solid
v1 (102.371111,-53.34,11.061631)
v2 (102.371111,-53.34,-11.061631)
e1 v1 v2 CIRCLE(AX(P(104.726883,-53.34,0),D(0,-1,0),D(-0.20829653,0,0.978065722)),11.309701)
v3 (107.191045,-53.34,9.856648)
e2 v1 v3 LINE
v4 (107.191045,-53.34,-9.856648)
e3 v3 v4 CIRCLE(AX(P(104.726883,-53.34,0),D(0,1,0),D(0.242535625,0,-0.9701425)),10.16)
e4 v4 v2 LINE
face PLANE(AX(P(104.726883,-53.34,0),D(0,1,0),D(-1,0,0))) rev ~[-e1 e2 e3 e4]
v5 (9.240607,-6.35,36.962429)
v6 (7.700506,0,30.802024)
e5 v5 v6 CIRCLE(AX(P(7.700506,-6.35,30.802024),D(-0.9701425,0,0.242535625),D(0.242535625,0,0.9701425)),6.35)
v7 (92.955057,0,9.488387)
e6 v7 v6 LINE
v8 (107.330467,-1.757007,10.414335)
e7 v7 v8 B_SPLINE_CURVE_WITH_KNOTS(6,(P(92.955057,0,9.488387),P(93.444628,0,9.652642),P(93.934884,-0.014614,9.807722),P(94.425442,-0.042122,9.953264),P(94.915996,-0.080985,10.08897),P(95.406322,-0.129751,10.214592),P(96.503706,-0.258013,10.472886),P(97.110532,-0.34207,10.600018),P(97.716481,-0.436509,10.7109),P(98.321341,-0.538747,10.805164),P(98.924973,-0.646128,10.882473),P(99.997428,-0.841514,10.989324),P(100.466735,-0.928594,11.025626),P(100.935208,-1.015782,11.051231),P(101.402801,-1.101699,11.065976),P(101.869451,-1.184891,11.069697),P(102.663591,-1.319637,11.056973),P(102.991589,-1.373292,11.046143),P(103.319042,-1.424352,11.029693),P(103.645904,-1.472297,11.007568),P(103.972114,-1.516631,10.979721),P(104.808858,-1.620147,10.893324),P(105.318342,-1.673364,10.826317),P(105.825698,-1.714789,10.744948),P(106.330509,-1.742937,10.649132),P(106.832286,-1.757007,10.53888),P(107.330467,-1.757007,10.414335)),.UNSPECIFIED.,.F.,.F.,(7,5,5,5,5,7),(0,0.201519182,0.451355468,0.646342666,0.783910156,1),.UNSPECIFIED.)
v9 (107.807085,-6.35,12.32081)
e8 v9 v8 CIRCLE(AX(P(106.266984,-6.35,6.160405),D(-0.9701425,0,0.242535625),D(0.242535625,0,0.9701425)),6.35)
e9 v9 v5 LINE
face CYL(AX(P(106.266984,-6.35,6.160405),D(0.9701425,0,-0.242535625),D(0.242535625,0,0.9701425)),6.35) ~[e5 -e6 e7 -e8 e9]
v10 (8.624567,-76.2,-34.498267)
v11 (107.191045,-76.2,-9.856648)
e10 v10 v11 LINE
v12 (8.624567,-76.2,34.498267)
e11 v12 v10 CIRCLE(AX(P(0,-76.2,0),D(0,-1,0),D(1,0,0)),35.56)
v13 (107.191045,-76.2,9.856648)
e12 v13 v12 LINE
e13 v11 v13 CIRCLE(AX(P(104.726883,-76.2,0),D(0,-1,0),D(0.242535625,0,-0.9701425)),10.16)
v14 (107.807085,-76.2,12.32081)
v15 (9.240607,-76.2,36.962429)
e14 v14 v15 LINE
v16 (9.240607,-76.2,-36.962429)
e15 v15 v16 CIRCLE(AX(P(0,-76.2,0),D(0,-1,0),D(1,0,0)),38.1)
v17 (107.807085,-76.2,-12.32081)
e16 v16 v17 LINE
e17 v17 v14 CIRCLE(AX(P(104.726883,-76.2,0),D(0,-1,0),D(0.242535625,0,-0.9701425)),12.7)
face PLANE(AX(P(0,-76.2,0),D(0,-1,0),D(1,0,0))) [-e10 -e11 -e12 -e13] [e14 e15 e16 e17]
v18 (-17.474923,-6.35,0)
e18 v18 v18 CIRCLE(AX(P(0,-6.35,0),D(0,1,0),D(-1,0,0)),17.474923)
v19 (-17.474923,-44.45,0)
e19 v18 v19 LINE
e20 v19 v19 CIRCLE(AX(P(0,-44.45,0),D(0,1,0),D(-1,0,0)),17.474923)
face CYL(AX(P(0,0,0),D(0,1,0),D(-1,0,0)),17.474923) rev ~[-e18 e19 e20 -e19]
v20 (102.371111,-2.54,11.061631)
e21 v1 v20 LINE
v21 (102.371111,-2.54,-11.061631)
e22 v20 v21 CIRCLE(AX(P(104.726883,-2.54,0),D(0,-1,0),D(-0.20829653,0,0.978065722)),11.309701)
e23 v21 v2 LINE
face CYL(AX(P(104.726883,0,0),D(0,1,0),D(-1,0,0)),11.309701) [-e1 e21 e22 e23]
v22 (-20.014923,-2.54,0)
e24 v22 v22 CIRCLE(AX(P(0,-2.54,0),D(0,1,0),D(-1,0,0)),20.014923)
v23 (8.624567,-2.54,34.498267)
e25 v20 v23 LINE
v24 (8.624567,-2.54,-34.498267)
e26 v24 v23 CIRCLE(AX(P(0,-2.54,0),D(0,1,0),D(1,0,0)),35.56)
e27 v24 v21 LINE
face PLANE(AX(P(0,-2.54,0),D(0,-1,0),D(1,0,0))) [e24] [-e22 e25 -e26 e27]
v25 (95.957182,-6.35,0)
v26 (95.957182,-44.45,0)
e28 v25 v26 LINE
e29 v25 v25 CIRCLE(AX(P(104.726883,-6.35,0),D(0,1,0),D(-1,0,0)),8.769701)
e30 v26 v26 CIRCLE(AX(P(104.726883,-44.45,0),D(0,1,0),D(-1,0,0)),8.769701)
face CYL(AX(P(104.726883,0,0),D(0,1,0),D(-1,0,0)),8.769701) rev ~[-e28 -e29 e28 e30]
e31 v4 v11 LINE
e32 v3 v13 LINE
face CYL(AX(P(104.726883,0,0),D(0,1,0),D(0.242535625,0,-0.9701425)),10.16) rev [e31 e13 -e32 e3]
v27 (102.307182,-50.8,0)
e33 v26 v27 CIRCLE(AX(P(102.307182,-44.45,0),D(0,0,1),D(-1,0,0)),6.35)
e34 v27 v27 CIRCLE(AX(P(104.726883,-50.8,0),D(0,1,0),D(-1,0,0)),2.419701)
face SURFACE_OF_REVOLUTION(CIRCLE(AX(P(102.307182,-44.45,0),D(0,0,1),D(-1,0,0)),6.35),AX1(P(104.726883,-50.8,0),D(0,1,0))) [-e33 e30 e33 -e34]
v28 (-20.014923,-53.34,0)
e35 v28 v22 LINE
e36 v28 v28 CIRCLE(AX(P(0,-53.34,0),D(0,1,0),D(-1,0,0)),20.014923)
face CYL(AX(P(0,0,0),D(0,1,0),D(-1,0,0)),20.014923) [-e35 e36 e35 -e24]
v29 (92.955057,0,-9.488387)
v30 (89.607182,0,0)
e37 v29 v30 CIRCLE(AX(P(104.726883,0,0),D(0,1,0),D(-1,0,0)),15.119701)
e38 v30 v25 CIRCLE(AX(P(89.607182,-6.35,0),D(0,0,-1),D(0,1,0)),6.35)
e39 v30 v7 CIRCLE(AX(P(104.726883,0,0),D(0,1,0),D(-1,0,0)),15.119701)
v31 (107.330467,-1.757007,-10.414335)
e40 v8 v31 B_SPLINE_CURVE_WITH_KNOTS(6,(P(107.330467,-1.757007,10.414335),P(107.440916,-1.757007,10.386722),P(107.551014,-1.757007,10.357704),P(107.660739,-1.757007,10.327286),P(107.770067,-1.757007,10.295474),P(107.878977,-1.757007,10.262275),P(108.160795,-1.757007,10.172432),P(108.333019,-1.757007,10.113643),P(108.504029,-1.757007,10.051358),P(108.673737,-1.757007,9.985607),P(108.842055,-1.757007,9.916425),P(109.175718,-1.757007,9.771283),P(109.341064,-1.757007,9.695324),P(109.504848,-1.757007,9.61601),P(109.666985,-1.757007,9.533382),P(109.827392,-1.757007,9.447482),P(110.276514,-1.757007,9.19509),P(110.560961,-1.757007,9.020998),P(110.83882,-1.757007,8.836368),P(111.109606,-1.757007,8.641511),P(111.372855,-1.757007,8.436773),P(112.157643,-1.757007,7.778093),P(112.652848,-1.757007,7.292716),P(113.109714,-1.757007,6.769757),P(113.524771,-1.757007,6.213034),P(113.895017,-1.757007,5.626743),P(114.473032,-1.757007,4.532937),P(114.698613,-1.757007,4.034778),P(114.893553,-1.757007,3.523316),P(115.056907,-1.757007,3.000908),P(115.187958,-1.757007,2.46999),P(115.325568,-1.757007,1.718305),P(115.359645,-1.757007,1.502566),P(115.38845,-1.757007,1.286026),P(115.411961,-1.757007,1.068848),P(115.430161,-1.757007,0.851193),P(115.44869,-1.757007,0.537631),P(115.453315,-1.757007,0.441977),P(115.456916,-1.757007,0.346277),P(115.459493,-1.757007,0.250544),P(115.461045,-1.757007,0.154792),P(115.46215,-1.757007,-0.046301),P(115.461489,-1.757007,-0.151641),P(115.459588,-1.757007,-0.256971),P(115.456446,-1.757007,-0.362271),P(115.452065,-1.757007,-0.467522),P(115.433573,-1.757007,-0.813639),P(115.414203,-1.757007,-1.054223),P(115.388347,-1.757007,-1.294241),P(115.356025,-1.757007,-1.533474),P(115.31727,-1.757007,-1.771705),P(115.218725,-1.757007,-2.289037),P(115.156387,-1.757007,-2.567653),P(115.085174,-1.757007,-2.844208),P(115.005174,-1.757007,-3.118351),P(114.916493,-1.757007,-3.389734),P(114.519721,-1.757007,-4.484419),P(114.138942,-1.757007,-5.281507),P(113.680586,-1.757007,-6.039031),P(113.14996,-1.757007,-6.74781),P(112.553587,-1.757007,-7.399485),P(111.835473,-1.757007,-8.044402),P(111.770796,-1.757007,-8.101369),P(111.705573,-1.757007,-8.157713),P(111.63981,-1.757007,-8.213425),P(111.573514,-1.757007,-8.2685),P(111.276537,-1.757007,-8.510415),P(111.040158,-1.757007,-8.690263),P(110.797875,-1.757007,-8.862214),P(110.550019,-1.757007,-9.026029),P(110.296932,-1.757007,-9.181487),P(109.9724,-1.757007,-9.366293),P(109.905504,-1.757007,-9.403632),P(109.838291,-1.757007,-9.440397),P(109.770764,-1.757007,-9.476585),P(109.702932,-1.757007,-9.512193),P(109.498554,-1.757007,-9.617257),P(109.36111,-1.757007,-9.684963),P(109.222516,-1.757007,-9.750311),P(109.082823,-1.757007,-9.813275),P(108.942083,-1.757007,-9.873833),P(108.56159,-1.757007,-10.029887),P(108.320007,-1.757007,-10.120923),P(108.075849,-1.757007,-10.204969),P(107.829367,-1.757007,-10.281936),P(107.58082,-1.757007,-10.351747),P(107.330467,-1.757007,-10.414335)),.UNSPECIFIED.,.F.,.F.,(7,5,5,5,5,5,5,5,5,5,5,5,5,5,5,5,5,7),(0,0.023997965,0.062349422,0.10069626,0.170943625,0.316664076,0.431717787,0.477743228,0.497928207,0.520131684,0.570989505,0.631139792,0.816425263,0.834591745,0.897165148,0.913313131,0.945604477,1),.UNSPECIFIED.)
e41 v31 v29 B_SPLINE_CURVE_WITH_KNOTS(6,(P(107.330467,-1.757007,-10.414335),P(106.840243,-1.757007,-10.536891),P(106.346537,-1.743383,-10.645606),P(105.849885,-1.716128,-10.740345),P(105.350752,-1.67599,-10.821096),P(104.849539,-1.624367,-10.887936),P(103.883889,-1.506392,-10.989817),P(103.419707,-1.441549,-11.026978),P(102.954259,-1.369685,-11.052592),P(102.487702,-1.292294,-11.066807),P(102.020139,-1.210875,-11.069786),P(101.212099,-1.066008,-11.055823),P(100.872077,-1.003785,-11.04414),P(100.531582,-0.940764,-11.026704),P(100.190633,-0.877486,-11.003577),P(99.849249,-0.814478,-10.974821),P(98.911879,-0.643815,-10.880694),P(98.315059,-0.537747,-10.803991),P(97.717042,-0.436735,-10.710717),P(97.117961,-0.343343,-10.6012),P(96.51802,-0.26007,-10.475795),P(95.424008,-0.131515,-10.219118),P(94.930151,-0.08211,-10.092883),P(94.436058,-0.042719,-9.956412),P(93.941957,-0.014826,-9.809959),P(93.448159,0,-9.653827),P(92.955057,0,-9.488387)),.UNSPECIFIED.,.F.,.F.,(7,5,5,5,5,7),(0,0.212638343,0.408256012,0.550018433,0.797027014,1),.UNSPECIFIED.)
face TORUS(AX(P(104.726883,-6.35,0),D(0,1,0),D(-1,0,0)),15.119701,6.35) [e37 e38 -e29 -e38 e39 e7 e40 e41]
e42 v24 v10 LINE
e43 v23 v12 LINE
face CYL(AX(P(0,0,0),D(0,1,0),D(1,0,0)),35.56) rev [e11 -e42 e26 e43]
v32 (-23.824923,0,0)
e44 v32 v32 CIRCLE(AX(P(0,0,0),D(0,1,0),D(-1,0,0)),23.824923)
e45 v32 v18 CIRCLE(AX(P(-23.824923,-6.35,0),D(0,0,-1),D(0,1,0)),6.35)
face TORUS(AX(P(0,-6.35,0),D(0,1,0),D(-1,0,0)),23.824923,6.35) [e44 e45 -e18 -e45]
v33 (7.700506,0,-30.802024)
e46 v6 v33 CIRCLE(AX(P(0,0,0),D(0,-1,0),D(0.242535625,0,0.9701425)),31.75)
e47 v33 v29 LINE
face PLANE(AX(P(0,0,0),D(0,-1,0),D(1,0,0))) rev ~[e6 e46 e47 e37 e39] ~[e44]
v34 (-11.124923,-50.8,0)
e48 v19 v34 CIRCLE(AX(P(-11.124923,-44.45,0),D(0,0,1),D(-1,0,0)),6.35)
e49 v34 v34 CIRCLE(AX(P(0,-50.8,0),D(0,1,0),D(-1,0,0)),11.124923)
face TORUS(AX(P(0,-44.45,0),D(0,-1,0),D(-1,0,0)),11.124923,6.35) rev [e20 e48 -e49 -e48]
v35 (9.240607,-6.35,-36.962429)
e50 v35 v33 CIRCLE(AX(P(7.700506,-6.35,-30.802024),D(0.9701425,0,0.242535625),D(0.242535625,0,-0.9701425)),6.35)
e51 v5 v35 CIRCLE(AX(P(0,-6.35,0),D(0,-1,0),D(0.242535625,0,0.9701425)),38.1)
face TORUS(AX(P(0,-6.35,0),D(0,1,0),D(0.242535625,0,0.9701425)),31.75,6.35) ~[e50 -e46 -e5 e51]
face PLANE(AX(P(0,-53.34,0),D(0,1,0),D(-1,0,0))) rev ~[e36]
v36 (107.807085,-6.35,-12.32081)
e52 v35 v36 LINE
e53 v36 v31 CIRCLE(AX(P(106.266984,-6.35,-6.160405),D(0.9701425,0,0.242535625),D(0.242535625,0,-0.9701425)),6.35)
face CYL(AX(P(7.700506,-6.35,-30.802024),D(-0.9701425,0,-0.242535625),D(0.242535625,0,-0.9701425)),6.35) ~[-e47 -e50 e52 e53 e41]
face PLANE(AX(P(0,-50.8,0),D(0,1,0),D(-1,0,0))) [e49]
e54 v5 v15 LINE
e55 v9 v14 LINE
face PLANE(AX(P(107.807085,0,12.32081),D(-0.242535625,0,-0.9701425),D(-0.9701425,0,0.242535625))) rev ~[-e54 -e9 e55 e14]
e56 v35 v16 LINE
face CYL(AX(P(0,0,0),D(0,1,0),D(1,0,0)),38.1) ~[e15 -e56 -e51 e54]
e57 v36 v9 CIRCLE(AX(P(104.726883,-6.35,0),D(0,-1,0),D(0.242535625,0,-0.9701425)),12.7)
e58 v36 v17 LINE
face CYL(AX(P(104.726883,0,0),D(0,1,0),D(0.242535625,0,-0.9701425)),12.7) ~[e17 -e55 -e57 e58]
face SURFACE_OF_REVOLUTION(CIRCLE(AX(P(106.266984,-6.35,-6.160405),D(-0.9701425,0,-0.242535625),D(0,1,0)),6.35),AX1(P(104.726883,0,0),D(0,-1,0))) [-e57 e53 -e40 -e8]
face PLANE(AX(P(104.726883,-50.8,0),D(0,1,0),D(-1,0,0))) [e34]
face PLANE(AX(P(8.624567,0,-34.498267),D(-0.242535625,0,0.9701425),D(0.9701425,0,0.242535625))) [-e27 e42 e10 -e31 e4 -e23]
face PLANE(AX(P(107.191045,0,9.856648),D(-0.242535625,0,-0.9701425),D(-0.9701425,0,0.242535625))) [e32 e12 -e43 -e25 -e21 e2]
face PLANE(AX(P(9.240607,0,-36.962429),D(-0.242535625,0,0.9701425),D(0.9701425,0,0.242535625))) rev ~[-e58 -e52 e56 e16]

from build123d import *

# Parameters (mm, degrees)
F1_DEPTH     = 76.2
F2_R         = 17.4749230477
F2_R_2       = 8.76970131
F3_DEPTH     = 50.8
F4_T         = 2.54
F5_T5_DEPTH  = 101.6
F5_T7_DEPTH  = 101.6
F5_T14_ANGLE = 151.9275130641
F5_T16_ANGLE = 208.0724869359


# Not quite as in the source:
# - a fillet or chamfer that OpenCascade refuses, or shapes differently, is made with other operations: its cross-section is extruded or revolved along the edge and cut away or added
# - a shell that OpenCascade refuses in one call is made with other operations: the cavity is built on its own and cut out


with BuildPart() as f1:
    # F0 (on Front) → F1 (new body)
    with BuildSketch(Plane.XZ):
        with BuildLine():
            ThreePointArc((9.2406073139, -36.9624292555), (30.0306271884, -23.4472051782), (38.1, 0))
            ThreePointArc((38.1, 0), (30.0306271884, 23.4472051782), (9.2406073139, 36.9624292555))
            ThreePointArc((9.2406073139, 36.9624292555), (-38.1, 0), (9.2406073139, -36.9624292555))
        make_face()
        with BuildLine():
            ThreePointArc((9.2406073139, 36.9624292555), (30.0306271884, 23.4472051782), (38.1, 0))
            ThreePointArc((38.1, 0), (30.0306271884, -23.4472051782), (9.2406073139, -36.9624292555))
            Line((9.2406073139, -36.9624292555), (107.8070853287, -12.3208097518))
            ThreePointArc((107.8070853287, -12.3208097518), (92.0268828907, 0), (107.8070853287, 12.3208097518))
            Line((107.8070853287, 12.3208097518), (9.2406073139, 36.9624292555))
        make_face()
        with BuildLine():
            ThreePointArc((117.4268828907, 0), (114.7370919535, 7.8157350594), (107.8070853287, 12.3208097518))
            ThreePointArc((107.8070853287, 12.3208097518), (92.0268828907, 0), (107.8070853287, -12.3208097518))
            ThreePointArc((107.8070853287, -12.3208097518), (114.7370919535, -7.8157350594), (117.4268828907, 0))
        make_face()
    extrude(amount=F1_DEPTH)

    # F2 (on face) → F3 (cut)
    with BuildSketch(Plane(origin=(0, 0, 0), x_dir=(-1, 0, 0), z_dir=(0, 1, 0))):
        Circle(F2_R)
        with Locations((-104.7268828907, 0)):
            Circle(F2_R_2)
    extrude(amount=-F3_DEPTH, mode=Mode.SUBTRACT)

    # F4: shell of thickness 2.54, made by hand


with BuildPart() as f4_core1:
    # F4_t2: copy of F1
    add(f1.part)

    # the walls: a layer under each face that stays
    f4_faces = [f4_core1.faces().sort_by_distance(p)[0] for p in [
        (-38.1, -38.1, 0),
        (58.5238463213, -38.1, 24.6416195037),
        (58.5238463213, -38.1, -24.6416195037),
        (39.6634414453, 0, 0),
        (117.4268828907, -38.1, 0),
        (113.4965842007, -25.4, 0),
        (17.4749230477, -25.4, 0),
        (104.7268828907, -50.8, 0),
        (0, -50.8, 0),
    ]]
    thicken(f4_faces, amount=-F4_T, mode=Mode.SUBTRACT)

    # F4_s3 → F4_t4 (revolve, cut)
    with BuildSketch(Plane.XY):
        Polygon((95.9825815807, -50.7746), (93.4171815807, -50.8), (93.4171815807, -53.34), (95.9571815807, -53.34), align=None)
    revolve(axis=Axis((104.7268828907, -50.8, 0), (0, 1, 0)), mode=Mode.SUBTRACT)

    # F4_s5 → F4_t6 (revolve, cut)
    with BuildSketch(Plane.XY):
        Polygon((-17.4495230477, -50.7746), (-20.0149230477, -50.8), (-20.0149230477, -53.34), (-17.4749230477, -53.34), align=None)
    revolve(axis=Axis((0, -50.8, 0), (0, 1, 0)), mode=Mode.SUBTRACT)


with BuildPart() as f1_1:
    add(f1.part)

    # what is left inside the walls is the cavity
    f4_cavity = [f4_core1.part.solids().sort_by_distance(p)[0] for p in [
        (-35.5346, -51.646667, 0),
    ]]
    add(f4_cavity, mode=Mode.SUBTRACT)

    # F5: fillet of radius 6.35 on 5 edges, made by hand

    # F5_s1 → F5_t2 (revolve)
    with BuildSketch(Plane.XY):
        with BuildLine():
            ThreePointArc((95.9571815807, -44.45), (97.8170535202, -48.9401280605), (102.3071815807, -50.8))
            Line((102.3071815807, -50.8), (95.9571815807, -50.8))
            Line((95.9571815807, -50.8), (95.9571815807, -44.45))
        make_face()
    revolve(axis=Axis((104.7268828907, -50.8, 0), (0, 1, 0)))

    # F5_s3 → F5_t4 (revolve)
    with BuildSketch(Plane.XY):
        with BuildLine():
            ThreePointArc((-17.4749230477, -44.45), (-15.6150511082, -48.9401280605), (-11.1249230477, -50.8))
            Line((-11.1249230477, -50.8), (-17.4749230477, -50.8))
            Line((-17.4749230477, -50.8), (-17.4749230477, -44.45))
        make_face()
    revolve(axis=Axis((0, -50.8, 0), (0, 1, 0)))

    # F5_s6 → F5_t5 (cut)
    with BuildSketch(Plane(origin=(98.5664780148, 0, -24.6416195037), x_dir=(0, 1, 0), z_dir=(-0.9701425001, 0, 0.242535625))):
        with BuildLine():
            ThreePointArc((-6.35, -38.1), (-1.8598719395, -36.2401280605), (0, -31.75))
            Line((0, -31.75), (0, -38.1))
            Line((0, -38.1), (-6.35, -38.1))
        make_face()
    extrude(amount=F5_T5_DEPTH, mode=Mode.SUBTRACT)

    # F5_s8 → F5_t7 (cut)
    with BuildSketch(Plane(origin=(0, 0, 0), x_dir=(0, 1, 0), z_dir=(0.9701425001, 0, 0.242535625))):
        with BuildLine():
            ThreePointArc((-6.35, -38.1), (-1.8598719395, -36.2401280605), (0, -31.75))
            Line((0, -31.75), (0, -38.1))
            Line((0, -38.1), (-6.35, -38.1))
        make_face()
    extrude(amount=F5_T7_DEPTH, mode=Mode.SUBTRACT)

    # F5_s9 → F5_t10 (revolve, cut)
    with BuildSketch(Plane.XY):
        with BuildLine():
            ThreePointArc((89.6071815807, 0), (94.0973096412, -1.8598719395), (95.9571815807, -6.35))
            Line((95.9571815807, -6.35), (95.9571815807, 0))
            Line((95.9571815807, 0), (89.6071815807, 0))
        make_face()
    revolve(axis=Axis((104.7268828907, 0, 0), (0, 1, 0)), mode=Mode.SUBTRACT)

    # F5_s11 → F5_t12 (revolve, cut)
    with BuildSketch(Plane.XY):
        with BuildLine():
            ThreePointArc((-23.8249230477, 0), (-19.3347949872, -1.8598719395), (-17.4749230477, -6.35))
            Line((-17.4749230477, -6.35), (-17.4749230477, 0))
            Line((-17.4749230477, 0), (-23.8249230477, 0))
        make_face()
    revolve(axis=Axis((0, 0, 0), (0, 1, 0)), mode=Mode.SUBTRACT)

    # F5_s13 → F5_t14 (revolve, cut)
    with BuildSketch(Plane(origin=(98.5664780148, 0, 24.6416195037), x_dir=(0, 1, 0), z_dir=(-0.9701425001, 0, -0.242535625))):
        with BuildLine():
            ThreePointArc((0, 31.75), (-1.8598719395, 36.2401280605), (-6.35, 38.1))
            Line((-6.35, 38.1), (0, 38.1))
            Line((0, 38.1), (0, 31.75))
        make_face()
    revolve(axis=Axis((104.7268828907, 0, 0), (0, -1, 0)), revolution_arc=F5_T14_ANGLE, mode=Mode.SUBTRACT)

    # F5_s15 → F5_t16 (revolve, cut)
    with BuildSketch(Plane(origin=(0, 0, 0), x_dir=(0, 1, 0), z_dir=(0.9701425001, 0, -0.242535625))):
        with BuildLine():
            ThreePointArc((-6.35, 38.1), (-1.8598719395, 36.2401280605), (0, 31.75))
            Line((0, 31.75), (0, 38.1))
            Line((0, 38.1), (-6.35, 38.1))
        make_face()
    revolve(axis=Axis((0, 0, 0), (0, -1, 0)), revolution_arc=F5_T16_ANGLE, mode=Mode.SUBTRACT)


solid = f1_1.part
